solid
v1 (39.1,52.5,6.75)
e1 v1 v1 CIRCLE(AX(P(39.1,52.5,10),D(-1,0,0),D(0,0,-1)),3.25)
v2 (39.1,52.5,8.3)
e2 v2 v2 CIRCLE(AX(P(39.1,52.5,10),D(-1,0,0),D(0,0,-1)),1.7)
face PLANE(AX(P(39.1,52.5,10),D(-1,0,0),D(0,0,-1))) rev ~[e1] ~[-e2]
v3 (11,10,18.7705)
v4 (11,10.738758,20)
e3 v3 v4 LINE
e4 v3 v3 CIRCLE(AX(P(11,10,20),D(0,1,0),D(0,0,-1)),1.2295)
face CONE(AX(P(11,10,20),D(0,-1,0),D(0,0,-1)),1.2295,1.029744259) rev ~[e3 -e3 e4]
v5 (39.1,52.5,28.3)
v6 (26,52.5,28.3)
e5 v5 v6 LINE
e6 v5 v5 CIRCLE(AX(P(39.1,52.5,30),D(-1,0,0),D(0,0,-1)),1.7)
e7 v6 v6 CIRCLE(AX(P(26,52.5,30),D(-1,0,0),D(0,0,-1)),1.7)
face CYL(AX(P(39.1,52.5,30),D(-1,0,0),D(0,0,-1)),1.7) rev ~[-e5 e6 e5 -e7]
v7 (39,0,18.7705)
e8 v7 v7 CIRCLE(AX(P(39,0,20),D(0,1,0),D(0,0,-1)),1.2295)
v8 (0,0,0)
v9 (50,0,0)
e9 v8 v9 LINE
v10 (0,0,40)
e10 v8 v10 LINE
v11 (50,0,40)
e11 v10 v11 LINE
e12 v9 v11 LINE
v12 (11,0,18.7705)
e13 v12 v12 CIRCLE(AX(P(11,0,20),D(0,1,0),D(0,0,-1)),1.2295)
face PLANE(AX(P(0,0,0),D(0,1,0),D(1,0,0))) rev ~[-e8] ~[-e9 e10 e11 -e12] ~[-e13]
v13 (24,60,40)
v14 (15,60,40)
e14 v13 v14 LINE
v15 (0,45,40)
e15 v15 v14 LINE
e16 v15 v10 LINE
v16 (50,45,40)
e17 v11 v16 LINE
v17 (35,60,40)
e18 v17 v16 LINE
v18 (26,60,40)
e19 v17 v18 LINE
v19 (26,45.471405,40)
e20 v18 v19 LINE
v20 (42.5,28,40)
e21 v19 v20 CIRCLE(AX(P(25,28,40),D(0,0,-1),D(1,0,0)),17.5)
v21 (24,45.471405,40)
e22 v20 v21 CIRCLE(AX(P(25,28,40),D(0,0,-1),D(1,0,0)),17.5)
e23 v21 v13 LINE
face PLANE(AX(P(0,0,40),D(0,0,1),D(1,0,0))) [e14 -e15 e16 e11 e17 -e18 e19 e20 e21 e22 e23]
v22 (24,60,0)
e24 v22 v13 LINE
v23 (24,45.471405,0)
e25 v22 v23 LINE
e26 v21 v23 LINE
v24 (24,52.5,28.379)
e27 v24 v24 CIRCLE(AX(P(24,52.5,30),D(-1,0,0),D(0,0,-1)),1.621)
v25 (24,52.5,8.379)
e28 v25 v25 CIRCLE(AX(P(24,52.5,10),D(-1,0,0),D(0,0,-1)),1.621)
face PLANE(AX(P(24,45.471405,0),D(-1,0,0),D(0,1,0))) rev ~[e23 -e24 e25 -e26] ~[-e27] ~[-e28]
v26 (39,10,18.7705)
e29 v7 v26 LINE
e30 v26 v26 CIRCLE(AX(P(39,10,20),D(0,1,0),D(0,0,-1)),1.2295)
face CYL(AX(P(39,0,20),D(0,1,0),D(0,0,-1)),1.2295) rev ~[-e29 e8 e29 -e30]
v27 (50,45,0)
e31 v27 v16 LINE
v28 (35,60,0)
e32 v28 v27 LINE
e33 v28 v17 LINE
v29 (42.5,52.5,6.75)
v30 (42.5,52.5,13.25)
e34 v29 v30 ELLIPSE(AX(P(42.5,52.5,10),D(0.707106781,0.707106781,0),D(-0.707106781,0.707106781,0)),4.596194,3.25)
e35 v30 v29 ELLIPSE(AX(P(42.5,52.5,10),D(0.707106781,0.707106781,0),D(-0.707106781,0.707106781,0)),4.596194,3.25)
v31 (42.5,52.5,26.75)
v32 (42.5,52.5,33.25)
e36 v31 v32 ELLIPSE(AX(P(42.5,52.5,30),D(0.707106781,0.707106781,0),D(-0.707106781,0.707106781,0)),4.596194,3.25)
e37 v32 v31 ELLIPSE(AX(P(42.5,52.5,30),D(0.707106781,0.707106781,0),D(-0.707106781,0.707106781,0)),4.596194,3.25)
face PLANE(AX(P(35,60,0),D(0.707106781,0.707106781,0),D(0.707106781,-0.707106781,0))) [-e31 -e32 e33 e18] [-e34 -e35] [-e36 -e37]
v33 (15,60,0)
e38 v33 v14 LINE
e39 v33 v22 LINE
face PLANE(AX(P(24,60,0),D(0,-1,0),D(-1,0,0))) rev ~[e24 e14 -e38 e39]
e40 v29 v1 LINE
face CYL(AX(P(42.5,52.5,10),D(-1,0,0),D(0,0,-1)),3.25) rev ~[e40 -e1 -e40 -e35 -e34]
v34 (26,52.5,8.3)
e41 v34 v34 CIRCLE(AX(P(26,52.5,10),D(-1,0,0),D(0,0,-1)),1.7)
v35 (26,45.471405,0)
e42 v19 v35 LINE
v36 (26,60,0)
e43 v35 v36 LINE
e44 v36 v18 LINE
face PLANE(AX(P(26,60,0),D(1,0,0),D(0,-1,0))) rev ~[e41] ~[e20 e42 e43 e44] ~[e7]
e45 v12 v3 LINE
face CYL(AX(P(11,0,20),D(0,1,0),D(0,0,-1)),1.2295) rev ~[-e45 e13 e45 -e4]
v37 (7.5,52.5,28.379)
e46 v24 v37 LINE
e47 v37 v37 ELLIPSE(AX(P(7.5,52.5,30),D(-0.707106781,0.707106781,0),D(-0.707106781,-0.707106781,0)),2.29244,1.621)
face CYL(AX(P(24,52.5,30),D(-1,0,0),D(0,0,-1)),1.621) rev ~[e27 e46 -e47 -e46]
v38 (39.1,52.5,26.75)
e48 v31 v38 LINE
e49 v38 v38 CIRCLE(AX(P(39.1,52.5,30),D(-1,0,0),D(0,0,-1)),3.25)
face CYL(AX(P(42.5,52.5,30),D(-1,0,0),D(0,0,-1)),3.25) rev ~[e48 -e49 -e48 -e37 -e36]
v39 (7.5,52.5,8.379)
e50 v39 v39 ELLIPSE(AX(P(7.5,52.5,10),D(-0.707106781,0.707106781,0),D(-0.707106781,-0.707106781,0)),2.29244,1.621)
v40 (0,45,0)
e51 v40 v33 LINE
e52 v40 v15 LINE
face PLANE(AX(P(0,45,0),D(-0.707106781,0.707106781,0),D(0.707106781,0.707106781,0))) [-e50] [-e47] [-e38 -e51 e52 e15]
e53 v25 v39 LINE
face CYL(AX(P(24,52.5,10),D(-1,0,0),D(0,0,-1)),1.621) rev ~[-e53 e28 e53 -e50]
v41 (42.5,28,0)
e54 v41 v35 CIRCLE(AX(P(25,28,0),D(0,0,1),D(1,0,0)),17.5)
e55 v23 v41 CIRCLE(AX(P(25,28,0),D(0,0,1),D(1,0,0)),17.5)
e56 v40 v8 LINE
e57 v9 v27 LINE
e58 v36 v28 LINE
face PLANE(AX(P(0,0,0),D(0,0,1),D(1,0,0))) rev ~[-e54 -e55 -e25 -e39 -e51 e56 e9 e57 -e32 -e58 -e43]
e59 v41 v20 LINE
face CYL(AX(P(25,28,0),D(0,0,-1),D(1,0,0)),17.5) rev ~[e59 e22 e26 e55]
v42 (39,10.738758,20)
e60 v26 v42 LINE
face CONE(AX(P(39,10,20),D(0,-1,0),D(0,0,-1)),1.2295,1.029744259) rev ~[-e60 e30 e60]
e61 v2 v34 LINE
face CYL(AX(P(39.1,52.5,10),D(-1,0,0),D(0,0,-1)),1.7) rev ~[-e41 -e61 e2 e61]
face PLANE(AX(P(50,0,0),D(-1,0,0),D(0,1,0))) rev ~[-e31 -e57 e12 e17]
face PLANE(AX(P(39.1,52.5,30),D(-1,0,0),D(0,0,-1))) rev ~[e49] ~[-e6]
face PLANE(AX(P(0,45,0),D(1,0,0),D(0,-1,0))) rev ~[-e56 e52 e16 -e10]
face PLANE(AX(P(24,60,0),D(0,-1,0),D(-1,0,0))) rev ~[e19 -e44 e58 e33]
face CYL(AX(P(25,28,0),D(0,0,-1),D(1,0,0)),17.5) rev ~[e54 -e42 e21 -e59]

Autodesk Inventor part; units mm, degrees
sketch "Skizze1" plane through (0, 0, 0) normal (0, 0, 1) x (1, 0, 0)
  line L0 (0, 0) -> (50, 0)
  line L1 (50, 0) -> (50, 45)
  line L2 (35, 60) -> (15, 60)
  line L3 (0, 45) -> (0, 0)
  circle A0 centre (25, 28) radius 17.5
  line L4 (25, 28) -> (25, 0) construction
  line L5 (0, 45) -> (15, 60)
  line L6 (35, 60) -> (50, 45)
  line L7 (24, 60) -> (26, 60)
  line L8 (26, 60) -> (26, 28)
  line L9 (26, 28) -> (24, 28)
  line L10 (24, 28) -> (24, 60)
  point P0 (50, 60)
  point P1 (0, 60)
  point P2 (25, 60)
  dimension "d0" = 50
  dimension "d1" = 35
  dimension "d2" = 60
  dimension "d3" = 15
  dimension "d4" = 15
  dimension "d5" = 15
  dimension "d6" = 15
  dimension "d7" = 28
  dimension "d10" = 2
extrude "Extrusion1" add sketch "Skizze1" along normal blind 40 contours L3 L5 L2 L10 A0 L8 L6 L1 L0 | L2 L8 A0 L10
extrude "Extrusion2" cut sketch "Skizze1" along normal up to surface (40 mm away) contours L2 L8 A0 L10 | A0 L8 L9 L10 picked at (24.8888, 33.8323)
sketch "Skizze2" plane through (0, 0, 0) normal (0, -1, 0) x (1, 0, 0)
  line L0 (0, 0) -> (0, 40) construction
  line L1 (50, 0) -> (50, 40) construction
  line L2 (0, 40) -> (50, 40) construction
  line L3 (0, 0) -> (0, 40) construction
  line L4 (25, 20) -> (25, 40) construction
  line L5 (7.5, 40) -> (42.5, 40) construction
  line L6 (11, 20) -> (39, 20) construction
  point P0 (26, 40)
  point P1 (24, 40)
  point P2 (0, 20)
  dimension "d13" = 28
hole "Bohrung1" at (11, 0, 20) at (39, 0, 20) direction (0, 1, 0) diameter 2.459 depth 10 tip angle 118 thread size "M3x0.5" class "6H" standard "ISO Metric profile"
ref_plane "Arbeitsebene1" through (42.5, 0, 0) normal (1, 0, 0) x (0, 0, -1)
sketch "Skizze3" plane through (42.5, 0, 0) normal (1, 0, 0) x (0, 0, -1)
  line L0 (0, 60) -> (-40, 60) construction
  line L1 (0, 45) -> (-40, 45) construction
  line L2 (-40, 45) -> (-40, 60) construction
  line L3 (-40, 52.5) -> (0, 52.5) construction
  line L4 (0, 45) -> (0, 60) construction
  point P0 (0, 0)
  point P1 (-20, 52.5)
  point P2 (-30, 52.5)
  point P3 (-10, 52.5)
  dimension "d44" = 10
  dimension "d45" = 10
ref_plane "Arbeitsebene2" through (0, 0, 20) normal (0, 0, 1) x (1, 0, 0)
ref_plane "Arbeitsebene3" through (0, 0, 30) normal (0, 0, 1) x (1, 0, 0)
ref_plane "Arbeitsebene4" through (0, 0, 10) normal (0, 0, -1) x (-1, 0, 0)
sketch "Skizze5" plane through (50, 0, 40) normal (1, 0, 0) x (0, 0, -1)
  line L0 (20, -12) -> (20, 72) construction
  line L1 (10, -12) -> (10, 72) construction
  line L2 (30, 72) -> (30, -12) construction
  point P0 (40, 0)
  dimension "Hole_Dist2Center" = 10
  dimension "d37" = 10
hole "Bohrung2" at (42.5, 52.5, 30) at (42.5, 52.5, 10) direction (-1, 0, 0) diameter 3.4 depth 18.5 counterbore diameter 6.5 counterbore depth 3.4 clearance for "Inbusschraube DIN EN ISO 4762" size "M3" standard "DIN"
delete faces "Fläche löschen1" heal yes whole lump no faces at (42.5, 50.5955, 29.1479) (42.5, 51.6084, 10.6154)
sketch "Skizze4" plane through (24, 45.4714, 0) normal (1, 0, 0) x (0, 0, -1)
  line L0 (-20, 7.0286) -> (-30, 7.0286) construction
  line L1 (-30, -57.4714) -> (-30, 26.5286) construction
  line L2 (-10, 26.5286) -> (-10, -57.4714) construction
  point P0 (0, -45.4714)
  point P1 (-10, 7.0286)
hole "Bohrung3" at (24, 52.5, 30) at (24, 52.5, 10) direction (-1, 0, 0) diameter 3.242 end through all thread size "M4x0.7" class "6H" standard "ISO Metric profile"
equation "\"d0\" = Fixation_Width"
equation "\"d4\" = d3"
equation "\"d5\" = d3"
equation "\"d6\" = d5"
equation "\"d8\" = Fixation_Thickness"
equation "\"d11\" = Fixation_Thickness"
equation "\"d13\" = FixationHole_Dist"
equation "\"d44\" = Hole_Dist2Center"
equation "\"d45\" = d44"
equation "\"Fixation_Thickness\" = 40"
equation "\"Fixation_Width\" = 50"
equation "\"FixationHole_Dist\" = 28"
equation "\"d21\" = -0.5 * d5"
properties part number "Motor_ParallelMecha_Fixation_Holder"
